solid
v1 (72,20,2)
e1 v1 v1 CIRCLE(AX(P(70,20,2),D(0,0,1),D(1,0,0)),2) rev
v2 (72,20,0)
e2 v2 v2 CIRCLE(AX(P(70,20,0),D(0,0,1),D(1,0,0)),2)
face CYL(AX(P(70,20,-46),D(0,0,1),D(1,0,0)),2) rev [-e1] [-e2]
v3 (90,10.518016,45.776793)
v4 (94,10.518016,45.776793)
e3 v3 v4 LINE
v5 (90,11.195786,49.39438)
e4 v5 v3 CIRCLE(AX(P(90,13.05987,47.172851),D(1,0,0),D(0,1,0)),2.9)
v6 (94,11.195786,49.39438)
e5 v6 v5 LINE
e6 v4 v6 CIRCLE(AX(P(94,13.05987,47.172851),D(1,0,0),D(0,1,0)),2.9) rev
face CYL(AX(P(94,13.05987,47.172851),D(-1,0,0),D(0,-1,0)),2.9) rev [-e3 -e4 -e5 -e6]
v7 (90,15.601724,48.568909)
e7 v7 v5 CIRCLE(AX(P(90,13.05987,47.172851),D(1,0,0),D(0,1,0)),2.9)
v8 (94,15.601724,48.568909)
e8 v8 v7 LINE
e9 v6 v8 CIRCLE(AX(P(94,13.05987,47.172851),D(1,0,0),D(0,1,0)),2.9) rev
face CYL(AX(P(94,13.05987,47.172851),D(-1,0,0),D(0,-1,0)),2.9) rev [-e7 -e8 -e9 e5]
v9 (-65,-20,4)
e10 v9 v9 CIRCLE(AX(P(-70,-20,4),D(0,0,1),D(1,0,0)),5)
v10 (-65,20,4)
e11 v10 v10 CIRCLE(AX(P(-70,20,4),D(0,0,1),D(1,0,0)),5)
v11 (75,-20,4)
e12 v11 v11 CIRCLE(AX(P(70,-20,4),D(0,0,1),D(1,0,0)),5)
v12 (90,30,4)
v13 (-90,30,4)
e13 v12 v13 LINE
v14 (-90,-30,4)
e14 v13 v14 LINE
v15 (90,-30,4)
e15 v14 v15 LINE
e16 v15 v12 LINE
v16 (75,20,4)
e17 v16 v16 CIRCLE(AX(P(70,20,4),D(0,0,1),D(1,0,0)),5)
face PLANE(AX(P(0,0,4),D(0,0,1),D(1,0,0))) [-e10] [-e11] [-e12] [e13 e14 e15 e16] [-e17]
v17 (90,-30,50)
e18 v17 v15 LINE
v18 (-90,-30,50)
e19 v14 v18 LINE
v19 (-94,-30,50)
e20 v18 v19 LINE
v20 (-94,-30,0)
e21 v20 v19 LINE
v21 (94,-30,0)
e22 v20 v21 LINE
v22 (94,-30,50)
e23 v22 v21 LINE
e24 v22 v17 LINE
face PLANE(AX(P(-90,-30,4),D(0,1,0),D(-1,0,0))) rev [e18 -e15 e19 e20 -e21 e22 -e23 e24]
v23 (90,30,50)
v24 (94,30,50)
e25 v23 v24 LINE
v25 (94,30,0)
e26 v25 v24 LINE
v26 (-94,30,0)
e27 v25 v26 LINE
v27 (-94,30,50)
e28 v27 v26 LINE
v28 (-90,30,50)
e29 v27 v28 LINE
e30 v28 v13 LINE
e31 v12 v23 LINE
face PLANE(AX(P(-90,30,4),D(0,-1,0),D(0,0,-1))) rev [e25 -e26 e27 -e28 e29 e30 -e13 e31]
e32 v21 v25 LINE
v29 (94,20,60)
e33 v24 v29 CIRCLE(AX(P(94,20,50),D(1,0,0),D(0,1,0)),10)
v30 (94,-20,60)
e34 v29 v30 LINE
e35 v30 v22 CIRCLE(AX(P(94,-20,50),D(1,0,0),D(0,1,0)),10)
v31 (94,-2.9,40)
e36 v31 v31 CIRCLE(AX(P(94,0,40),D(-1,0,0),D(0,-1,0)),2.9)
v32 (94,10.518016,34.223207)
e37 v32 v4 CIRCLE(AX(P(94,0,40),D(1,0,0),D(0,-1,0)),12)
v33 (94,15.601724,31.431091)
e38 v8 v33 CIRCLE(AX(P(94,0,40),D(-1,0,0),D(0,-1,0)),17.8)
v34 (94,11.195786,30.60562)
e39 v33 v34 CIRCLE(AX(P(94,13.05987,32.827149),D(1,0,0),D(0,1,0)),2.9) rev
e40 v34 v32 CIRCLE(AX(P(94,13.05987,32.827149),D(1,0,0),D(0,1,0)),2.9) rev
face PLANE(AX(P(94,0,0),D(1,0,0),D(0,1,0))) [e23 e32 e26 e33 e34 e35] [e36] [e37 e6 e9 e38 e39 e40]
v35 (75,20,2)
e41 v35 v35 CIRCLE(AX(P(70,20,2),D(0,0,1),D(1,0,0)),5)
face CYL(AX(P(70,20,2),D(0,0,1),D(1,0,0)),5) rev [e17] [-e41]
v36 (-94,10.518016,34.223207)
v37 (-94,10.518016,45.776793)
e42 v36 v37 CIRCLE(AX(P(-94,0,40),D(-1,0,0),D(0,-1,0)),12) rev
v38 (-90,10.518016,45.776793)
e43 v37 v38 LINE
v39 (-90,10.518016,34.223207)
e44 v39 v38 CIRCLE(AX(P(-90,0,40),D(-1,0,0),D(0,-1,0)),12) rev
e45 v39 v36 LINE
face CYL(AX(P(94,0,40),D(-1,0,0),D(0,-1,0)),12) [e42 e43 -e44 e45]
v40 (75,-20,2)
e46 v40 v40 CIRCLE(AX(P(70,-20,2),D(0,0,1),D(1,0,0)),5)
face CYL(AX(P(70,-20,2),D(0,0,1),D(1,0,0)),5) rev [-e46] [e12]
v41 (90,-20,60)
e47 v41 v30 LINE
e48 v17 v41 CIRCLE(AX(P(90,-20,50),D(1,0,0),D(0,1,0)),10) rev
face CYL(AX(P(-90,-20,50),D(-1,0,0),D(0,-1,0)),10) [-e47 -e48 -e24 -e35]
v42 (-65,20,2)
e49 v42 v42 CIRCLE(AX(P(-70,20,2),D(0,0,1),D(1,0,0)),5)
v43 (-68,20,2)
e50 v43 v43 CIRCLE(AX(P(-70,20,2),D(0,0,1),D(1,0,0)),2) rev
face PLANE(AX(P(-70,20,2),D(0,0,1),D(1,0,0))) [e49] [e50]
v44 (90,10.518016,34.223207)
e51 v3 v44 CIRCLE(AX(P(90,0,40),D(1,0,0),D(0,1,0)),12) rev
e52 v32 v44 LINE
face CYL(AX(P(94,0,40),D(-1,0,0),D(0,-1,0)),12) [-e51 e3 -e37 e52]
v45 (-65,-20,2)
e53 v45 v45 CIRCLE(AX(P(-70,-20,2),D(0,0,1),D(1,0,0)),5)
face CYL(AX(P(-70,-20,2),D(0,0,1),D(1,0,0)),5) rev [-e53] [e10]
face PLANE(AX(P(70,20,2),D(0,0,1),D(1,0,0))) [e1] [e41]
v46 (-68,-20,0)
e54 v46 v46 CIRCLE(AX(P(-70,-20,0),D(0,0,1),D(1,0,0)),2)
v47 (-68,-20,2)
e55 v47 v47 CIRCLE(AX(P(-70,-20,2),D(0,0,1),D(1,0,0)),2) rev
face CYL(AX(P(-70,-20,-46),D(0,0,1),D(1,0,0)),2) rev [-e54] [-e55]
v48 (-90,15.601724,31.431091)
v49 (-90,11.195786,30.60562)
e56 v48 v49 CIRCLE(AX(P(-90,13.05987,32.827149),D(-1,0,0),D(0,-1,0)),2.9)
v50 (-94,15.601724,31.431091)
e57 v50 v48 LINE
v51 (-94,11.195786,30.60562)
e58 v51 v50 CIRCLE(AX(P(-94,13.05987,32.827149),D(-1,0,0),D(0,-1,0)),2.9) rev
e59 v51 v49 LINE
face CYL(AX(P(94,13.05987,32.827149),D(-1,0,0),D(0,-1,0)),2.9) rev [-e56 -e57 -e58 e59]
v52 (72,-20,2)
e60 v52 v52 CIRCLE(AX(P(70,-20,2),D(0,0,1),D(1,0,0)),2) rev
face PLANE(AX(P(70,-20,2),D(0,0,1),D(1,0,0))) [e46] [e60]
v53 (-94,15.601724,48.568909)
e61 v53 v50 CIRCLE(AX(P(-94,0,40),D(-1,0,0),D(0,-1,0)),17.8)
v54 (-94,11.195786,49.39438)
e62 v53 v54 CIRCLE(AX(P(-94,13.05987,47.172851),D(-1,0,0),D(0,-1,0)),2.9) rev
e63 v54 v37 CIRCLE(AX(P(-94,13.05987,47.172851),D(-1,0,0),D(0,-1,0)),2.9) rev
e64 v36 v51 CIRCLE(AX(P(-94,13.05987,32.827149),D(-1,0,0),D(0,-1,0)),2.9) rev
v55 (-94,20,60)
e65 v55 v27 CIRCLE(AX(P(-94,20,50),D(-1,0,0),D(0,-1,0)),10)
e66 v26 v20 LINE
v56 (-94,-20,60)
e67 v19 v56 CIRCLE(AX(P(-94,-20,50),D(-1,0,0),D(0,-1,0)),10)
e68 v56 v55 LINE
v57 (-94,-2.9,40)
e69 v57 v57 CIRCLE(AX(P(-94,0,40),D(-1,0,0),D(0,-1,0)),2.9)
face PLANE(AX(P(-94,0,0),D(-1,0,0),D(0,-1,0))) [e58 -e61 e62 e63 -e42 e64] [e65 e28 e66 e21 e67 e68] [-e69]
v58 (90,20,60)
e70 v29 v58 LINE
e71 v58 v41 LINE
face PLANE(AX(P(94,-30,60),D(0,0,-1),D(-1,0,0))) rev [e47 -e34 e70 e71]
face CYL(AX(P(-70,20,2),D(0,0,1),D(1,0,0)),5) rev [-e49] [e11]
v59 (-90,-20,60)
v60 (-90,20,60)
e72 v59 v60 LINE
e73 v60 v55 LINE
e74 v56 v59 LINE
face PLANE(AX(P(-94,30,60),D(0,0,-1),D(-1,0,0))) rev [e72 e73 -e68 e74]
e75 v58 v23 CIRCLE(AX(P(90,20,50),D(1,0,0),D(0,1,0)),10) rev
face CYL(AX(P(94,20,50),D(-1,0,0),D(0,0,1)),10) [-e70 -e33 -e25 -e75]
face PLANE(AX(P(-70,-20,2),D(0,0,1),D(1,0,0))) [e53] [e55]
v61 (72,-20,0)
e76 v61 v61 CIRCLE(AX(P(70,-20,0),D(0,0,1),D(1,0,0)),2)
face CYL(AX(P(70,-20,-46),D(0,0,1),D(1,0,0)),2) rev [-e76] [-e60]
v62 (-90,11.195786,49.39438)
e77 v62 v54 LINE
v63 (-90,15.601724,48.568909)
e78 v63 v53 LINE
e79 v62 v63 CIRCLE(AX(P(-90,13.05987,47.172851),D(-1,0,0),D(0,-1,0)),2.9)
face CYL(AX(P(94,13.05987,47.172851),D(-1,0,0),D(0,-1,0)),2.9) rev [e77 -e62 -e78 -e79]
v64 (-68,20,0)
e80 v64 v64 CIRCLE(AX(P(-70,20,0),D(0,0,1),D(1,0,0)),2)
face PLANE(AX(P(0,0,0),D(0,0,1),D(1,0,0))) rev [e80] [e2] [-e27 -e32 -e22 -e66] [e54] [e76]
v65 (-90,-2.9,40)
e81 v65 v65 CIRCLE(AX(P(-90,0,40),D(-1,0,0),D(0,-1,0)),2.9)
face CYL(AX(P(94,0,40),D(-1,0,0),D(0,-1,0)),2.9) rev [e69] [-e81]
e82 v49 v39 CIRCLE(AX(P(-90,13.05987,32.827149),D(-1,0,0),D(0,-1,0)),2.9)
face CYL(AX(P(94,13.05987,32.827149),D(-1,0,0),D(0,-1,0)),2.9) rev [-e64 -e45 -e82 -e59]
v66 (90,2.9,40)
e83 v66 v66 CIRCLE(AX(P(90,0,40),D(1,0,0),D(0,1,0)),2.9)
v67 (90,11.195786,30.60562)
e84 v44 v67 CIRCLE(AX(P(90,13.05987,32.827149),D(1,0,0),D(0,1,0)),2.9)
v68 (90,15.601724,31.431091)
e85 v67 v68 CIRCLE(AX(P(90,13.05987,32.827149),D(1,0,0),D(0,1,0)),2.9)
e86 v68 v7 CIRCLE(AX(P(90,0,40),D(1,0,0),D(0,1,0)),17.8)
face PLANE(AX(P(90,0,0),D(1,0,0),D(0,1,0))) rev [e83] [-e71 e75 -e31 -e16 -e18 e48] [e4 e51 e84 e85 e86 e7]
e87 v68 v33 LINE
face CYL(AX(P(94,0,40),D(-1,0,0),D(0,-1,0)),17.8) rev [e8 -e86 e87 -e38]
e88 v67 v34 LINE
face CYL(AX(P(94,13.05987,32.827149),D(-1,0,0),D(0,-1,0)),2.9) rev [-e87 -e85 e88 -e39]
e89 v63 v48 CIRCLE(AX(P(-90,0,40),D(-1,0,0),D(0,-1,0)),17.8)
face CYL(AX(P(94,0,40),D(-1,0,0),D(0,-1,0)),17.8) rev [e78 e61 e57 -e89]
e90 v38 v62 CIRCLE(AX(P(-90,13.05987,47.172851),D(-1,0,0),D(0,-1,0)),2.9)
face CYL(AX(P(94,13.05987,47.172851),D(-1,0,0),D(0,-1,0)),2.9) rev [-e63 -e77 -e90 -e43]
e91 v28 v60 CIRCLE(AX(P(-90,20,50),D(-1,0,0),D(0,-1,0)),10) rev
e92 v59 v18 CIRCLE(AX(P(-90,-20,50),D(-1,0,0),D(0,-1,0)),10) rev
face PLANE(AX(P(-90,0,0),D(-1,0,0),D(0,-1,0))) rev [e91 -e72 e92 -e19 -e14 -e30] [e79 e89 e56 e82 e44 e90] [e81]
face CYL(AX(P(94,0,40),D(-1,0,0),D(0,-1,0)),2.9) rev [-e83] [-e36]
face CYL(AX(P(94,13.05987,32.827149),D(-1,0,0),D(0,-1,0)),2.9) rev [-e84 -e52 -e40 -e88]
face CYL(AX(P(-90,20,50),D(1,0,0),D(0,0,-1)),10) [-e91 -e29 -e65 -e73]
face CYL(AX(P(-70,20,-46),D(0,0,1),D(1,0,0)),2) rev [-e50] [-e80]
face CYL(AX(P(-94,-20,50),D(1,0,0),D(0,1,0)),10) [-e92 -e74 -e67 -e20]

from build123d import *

# Parameters (mm, degrees)
SKETCH_1_W               = 180
SKETCH_1_H               = 60
EXTRUDE_1_DEPTH          = 4
SKETCH_4_R               = 2
CUT_EXTRUDE_2_DEPTH      = 50
SKETCH_8_R               = 5
CUT_EXTRUDE_6_DEPTH      = 2
SKETCH_9_W               = 60
SKETCH_9_H               = 60
EXTRUDE_2_DEPTH          = 4
SKETCH_10_W              = 60
SKETCH_10_H              = 60
EXTRUDE_3_DEPTH          = 4
CUT_EXTRUDE_7_DEPTH      = 200.609619007
CUT_EXTRUDE_7_DEPTH_BACK = 200.609619007
SKETCH_11_R              = 2.9
FILLET_1_R               = 2.9
FILLET_2_R               = 2.9
FILLET_3_R               = 10


with BuildPart() as part:
    # 草图1 → 凸台-拉伸1 (new body)
    with BuildSketch(Plane.XY):
        Rectangle(SKETCH_1_W, SKETCH_1_H)
    extrude(amount=EXTRUDE_1_DEPTH)

    # 草图4 → 切除-拉伸2 (cut)
    with BuildSketch(Plane.XY.offset(4)):
        with Locations((-70, 20)):
            Circle(SKETCH_4_R)
        with Locations((-70, -20)):
            Circle(SKETCH_4_R)
        with Locations((70, 20)):
            Circle(SKETCH_4_R)
        with Locations((70, -20)):
            Circle(SKETCH_4_R)
    extrude(amount=-CUT_EXTRUDE_2_DEPTH, mode=Mode.SUBTRACT)

    # 草图8 → 切除-拉伸6 (cut)
    with BuildSketch(Plane.XY.offset(4)):
        with Locations((70, 20)):
            Circle(SKETCH_8_R)
        with Locations((-70, 20)):
            Circle(SKETCH_8_R)
        with Locations((-70, -20)):
            Circle(SKETCH_8_R)
        with Locations((70, -20)):
            Circle(SKETCH_8_R)
    extrude(amount=-CUT_EXTRUDE_6_DEPTH, mode=Mode.SUBTRACT)

    # 草图9 → 凸台-拉伸2 (add)
    with BuildSketch(Plane(origin=(90, 0, 0), x_dir=(0, 0, -1), z_dir=(1, 0, 0))):
        with Locations((-30, 0)):
            Rectangle(SKETCH_9_W, SKETCH_9_H)
    extrude(amount=EXTRUDE_2_DEPTH)

    # 草图10 → 凸台-拉伸3 (add)
    with BuildSketch(Plane.ZY.offset(90)):
        with Locations((30, 0)):
            Rectangle(SKETCH_10_W, SKETCH_10_H)
    extrude(amount=EXTRUDE_3_DEPTH)

    # 草图11 → 切除-拉伸7 (cut, two sides: drawn at the far end of the back side and taken through both)
    with BuildSketch(Plane.ZY.offset(94).offset(-CUT_EXTRUDE_7_DEPTH_BACK)):
        with Locations(Location((40, 0, 0), (0, 0, 270))):
            Circle(SKETCH_11_R)
        with BuildLine():
            Line((47.713451316, 9.192533317), (51.441619452, 13.635591088))
            ThreePointArc((51.441619452, 13.635591088), (40, 17.8), (28.558380548, 13.635591088))
            Line((28.558380548, 13.635591088), (32.286548684, 9.192533317))
            ThreePointArc((32.286548684, 9.192533317), (40, 12), (47.713451316, 9.192533317))
        make_face()
    extrude(amount=CUT_EXTRUDE_7_DEPTH + CUT_EXTRUDE_7_DEPTH_BACK, mode=Mode.SUBTRACT)

    # 圆角1
    fillet_1_edges = [part.edges().sort_by_distance(p)[0] for p in [
        (-92, 13.635591088, 51.441619452),
        (-92, 9.192533317, 47.713451316),
        (-92, 13.635591088, 28.558380548),
        (-92, 9.192533317, 32.286548684),
    ]]
    fillet(fillet_1_edges, radius=FILLET_1_R - 0.0001)  # a hair under: the kernel refuses the full size

    # 圆角2
    fillet_2_edges = [part.edges().sort_by_distance(p)[0] for p in [
        (92, 13.635591088, 28.558380548),
        (92, 13.635591088, 51.441619452),
        (92, 9.192533317, 47.713451316),
        (92, 9.192533317, 32.286548684),
    ]]
    fillet(fillet_2_edges, radius=FILLET_2_R - 0.0001)  # a hair under: the kernel refuses the full size

    # 圆角3
    fillet_3_edges = [part.edges().sort_by_distance(p)[0] for p in [
        (92, 30, 60),
        (92, -30, 60),
        (-92, -30, 60),
        (-92, 30, 60),
    ]]
    fillet(fillet_3_edges, radius=FILLET_3_R)


solid = part.part
